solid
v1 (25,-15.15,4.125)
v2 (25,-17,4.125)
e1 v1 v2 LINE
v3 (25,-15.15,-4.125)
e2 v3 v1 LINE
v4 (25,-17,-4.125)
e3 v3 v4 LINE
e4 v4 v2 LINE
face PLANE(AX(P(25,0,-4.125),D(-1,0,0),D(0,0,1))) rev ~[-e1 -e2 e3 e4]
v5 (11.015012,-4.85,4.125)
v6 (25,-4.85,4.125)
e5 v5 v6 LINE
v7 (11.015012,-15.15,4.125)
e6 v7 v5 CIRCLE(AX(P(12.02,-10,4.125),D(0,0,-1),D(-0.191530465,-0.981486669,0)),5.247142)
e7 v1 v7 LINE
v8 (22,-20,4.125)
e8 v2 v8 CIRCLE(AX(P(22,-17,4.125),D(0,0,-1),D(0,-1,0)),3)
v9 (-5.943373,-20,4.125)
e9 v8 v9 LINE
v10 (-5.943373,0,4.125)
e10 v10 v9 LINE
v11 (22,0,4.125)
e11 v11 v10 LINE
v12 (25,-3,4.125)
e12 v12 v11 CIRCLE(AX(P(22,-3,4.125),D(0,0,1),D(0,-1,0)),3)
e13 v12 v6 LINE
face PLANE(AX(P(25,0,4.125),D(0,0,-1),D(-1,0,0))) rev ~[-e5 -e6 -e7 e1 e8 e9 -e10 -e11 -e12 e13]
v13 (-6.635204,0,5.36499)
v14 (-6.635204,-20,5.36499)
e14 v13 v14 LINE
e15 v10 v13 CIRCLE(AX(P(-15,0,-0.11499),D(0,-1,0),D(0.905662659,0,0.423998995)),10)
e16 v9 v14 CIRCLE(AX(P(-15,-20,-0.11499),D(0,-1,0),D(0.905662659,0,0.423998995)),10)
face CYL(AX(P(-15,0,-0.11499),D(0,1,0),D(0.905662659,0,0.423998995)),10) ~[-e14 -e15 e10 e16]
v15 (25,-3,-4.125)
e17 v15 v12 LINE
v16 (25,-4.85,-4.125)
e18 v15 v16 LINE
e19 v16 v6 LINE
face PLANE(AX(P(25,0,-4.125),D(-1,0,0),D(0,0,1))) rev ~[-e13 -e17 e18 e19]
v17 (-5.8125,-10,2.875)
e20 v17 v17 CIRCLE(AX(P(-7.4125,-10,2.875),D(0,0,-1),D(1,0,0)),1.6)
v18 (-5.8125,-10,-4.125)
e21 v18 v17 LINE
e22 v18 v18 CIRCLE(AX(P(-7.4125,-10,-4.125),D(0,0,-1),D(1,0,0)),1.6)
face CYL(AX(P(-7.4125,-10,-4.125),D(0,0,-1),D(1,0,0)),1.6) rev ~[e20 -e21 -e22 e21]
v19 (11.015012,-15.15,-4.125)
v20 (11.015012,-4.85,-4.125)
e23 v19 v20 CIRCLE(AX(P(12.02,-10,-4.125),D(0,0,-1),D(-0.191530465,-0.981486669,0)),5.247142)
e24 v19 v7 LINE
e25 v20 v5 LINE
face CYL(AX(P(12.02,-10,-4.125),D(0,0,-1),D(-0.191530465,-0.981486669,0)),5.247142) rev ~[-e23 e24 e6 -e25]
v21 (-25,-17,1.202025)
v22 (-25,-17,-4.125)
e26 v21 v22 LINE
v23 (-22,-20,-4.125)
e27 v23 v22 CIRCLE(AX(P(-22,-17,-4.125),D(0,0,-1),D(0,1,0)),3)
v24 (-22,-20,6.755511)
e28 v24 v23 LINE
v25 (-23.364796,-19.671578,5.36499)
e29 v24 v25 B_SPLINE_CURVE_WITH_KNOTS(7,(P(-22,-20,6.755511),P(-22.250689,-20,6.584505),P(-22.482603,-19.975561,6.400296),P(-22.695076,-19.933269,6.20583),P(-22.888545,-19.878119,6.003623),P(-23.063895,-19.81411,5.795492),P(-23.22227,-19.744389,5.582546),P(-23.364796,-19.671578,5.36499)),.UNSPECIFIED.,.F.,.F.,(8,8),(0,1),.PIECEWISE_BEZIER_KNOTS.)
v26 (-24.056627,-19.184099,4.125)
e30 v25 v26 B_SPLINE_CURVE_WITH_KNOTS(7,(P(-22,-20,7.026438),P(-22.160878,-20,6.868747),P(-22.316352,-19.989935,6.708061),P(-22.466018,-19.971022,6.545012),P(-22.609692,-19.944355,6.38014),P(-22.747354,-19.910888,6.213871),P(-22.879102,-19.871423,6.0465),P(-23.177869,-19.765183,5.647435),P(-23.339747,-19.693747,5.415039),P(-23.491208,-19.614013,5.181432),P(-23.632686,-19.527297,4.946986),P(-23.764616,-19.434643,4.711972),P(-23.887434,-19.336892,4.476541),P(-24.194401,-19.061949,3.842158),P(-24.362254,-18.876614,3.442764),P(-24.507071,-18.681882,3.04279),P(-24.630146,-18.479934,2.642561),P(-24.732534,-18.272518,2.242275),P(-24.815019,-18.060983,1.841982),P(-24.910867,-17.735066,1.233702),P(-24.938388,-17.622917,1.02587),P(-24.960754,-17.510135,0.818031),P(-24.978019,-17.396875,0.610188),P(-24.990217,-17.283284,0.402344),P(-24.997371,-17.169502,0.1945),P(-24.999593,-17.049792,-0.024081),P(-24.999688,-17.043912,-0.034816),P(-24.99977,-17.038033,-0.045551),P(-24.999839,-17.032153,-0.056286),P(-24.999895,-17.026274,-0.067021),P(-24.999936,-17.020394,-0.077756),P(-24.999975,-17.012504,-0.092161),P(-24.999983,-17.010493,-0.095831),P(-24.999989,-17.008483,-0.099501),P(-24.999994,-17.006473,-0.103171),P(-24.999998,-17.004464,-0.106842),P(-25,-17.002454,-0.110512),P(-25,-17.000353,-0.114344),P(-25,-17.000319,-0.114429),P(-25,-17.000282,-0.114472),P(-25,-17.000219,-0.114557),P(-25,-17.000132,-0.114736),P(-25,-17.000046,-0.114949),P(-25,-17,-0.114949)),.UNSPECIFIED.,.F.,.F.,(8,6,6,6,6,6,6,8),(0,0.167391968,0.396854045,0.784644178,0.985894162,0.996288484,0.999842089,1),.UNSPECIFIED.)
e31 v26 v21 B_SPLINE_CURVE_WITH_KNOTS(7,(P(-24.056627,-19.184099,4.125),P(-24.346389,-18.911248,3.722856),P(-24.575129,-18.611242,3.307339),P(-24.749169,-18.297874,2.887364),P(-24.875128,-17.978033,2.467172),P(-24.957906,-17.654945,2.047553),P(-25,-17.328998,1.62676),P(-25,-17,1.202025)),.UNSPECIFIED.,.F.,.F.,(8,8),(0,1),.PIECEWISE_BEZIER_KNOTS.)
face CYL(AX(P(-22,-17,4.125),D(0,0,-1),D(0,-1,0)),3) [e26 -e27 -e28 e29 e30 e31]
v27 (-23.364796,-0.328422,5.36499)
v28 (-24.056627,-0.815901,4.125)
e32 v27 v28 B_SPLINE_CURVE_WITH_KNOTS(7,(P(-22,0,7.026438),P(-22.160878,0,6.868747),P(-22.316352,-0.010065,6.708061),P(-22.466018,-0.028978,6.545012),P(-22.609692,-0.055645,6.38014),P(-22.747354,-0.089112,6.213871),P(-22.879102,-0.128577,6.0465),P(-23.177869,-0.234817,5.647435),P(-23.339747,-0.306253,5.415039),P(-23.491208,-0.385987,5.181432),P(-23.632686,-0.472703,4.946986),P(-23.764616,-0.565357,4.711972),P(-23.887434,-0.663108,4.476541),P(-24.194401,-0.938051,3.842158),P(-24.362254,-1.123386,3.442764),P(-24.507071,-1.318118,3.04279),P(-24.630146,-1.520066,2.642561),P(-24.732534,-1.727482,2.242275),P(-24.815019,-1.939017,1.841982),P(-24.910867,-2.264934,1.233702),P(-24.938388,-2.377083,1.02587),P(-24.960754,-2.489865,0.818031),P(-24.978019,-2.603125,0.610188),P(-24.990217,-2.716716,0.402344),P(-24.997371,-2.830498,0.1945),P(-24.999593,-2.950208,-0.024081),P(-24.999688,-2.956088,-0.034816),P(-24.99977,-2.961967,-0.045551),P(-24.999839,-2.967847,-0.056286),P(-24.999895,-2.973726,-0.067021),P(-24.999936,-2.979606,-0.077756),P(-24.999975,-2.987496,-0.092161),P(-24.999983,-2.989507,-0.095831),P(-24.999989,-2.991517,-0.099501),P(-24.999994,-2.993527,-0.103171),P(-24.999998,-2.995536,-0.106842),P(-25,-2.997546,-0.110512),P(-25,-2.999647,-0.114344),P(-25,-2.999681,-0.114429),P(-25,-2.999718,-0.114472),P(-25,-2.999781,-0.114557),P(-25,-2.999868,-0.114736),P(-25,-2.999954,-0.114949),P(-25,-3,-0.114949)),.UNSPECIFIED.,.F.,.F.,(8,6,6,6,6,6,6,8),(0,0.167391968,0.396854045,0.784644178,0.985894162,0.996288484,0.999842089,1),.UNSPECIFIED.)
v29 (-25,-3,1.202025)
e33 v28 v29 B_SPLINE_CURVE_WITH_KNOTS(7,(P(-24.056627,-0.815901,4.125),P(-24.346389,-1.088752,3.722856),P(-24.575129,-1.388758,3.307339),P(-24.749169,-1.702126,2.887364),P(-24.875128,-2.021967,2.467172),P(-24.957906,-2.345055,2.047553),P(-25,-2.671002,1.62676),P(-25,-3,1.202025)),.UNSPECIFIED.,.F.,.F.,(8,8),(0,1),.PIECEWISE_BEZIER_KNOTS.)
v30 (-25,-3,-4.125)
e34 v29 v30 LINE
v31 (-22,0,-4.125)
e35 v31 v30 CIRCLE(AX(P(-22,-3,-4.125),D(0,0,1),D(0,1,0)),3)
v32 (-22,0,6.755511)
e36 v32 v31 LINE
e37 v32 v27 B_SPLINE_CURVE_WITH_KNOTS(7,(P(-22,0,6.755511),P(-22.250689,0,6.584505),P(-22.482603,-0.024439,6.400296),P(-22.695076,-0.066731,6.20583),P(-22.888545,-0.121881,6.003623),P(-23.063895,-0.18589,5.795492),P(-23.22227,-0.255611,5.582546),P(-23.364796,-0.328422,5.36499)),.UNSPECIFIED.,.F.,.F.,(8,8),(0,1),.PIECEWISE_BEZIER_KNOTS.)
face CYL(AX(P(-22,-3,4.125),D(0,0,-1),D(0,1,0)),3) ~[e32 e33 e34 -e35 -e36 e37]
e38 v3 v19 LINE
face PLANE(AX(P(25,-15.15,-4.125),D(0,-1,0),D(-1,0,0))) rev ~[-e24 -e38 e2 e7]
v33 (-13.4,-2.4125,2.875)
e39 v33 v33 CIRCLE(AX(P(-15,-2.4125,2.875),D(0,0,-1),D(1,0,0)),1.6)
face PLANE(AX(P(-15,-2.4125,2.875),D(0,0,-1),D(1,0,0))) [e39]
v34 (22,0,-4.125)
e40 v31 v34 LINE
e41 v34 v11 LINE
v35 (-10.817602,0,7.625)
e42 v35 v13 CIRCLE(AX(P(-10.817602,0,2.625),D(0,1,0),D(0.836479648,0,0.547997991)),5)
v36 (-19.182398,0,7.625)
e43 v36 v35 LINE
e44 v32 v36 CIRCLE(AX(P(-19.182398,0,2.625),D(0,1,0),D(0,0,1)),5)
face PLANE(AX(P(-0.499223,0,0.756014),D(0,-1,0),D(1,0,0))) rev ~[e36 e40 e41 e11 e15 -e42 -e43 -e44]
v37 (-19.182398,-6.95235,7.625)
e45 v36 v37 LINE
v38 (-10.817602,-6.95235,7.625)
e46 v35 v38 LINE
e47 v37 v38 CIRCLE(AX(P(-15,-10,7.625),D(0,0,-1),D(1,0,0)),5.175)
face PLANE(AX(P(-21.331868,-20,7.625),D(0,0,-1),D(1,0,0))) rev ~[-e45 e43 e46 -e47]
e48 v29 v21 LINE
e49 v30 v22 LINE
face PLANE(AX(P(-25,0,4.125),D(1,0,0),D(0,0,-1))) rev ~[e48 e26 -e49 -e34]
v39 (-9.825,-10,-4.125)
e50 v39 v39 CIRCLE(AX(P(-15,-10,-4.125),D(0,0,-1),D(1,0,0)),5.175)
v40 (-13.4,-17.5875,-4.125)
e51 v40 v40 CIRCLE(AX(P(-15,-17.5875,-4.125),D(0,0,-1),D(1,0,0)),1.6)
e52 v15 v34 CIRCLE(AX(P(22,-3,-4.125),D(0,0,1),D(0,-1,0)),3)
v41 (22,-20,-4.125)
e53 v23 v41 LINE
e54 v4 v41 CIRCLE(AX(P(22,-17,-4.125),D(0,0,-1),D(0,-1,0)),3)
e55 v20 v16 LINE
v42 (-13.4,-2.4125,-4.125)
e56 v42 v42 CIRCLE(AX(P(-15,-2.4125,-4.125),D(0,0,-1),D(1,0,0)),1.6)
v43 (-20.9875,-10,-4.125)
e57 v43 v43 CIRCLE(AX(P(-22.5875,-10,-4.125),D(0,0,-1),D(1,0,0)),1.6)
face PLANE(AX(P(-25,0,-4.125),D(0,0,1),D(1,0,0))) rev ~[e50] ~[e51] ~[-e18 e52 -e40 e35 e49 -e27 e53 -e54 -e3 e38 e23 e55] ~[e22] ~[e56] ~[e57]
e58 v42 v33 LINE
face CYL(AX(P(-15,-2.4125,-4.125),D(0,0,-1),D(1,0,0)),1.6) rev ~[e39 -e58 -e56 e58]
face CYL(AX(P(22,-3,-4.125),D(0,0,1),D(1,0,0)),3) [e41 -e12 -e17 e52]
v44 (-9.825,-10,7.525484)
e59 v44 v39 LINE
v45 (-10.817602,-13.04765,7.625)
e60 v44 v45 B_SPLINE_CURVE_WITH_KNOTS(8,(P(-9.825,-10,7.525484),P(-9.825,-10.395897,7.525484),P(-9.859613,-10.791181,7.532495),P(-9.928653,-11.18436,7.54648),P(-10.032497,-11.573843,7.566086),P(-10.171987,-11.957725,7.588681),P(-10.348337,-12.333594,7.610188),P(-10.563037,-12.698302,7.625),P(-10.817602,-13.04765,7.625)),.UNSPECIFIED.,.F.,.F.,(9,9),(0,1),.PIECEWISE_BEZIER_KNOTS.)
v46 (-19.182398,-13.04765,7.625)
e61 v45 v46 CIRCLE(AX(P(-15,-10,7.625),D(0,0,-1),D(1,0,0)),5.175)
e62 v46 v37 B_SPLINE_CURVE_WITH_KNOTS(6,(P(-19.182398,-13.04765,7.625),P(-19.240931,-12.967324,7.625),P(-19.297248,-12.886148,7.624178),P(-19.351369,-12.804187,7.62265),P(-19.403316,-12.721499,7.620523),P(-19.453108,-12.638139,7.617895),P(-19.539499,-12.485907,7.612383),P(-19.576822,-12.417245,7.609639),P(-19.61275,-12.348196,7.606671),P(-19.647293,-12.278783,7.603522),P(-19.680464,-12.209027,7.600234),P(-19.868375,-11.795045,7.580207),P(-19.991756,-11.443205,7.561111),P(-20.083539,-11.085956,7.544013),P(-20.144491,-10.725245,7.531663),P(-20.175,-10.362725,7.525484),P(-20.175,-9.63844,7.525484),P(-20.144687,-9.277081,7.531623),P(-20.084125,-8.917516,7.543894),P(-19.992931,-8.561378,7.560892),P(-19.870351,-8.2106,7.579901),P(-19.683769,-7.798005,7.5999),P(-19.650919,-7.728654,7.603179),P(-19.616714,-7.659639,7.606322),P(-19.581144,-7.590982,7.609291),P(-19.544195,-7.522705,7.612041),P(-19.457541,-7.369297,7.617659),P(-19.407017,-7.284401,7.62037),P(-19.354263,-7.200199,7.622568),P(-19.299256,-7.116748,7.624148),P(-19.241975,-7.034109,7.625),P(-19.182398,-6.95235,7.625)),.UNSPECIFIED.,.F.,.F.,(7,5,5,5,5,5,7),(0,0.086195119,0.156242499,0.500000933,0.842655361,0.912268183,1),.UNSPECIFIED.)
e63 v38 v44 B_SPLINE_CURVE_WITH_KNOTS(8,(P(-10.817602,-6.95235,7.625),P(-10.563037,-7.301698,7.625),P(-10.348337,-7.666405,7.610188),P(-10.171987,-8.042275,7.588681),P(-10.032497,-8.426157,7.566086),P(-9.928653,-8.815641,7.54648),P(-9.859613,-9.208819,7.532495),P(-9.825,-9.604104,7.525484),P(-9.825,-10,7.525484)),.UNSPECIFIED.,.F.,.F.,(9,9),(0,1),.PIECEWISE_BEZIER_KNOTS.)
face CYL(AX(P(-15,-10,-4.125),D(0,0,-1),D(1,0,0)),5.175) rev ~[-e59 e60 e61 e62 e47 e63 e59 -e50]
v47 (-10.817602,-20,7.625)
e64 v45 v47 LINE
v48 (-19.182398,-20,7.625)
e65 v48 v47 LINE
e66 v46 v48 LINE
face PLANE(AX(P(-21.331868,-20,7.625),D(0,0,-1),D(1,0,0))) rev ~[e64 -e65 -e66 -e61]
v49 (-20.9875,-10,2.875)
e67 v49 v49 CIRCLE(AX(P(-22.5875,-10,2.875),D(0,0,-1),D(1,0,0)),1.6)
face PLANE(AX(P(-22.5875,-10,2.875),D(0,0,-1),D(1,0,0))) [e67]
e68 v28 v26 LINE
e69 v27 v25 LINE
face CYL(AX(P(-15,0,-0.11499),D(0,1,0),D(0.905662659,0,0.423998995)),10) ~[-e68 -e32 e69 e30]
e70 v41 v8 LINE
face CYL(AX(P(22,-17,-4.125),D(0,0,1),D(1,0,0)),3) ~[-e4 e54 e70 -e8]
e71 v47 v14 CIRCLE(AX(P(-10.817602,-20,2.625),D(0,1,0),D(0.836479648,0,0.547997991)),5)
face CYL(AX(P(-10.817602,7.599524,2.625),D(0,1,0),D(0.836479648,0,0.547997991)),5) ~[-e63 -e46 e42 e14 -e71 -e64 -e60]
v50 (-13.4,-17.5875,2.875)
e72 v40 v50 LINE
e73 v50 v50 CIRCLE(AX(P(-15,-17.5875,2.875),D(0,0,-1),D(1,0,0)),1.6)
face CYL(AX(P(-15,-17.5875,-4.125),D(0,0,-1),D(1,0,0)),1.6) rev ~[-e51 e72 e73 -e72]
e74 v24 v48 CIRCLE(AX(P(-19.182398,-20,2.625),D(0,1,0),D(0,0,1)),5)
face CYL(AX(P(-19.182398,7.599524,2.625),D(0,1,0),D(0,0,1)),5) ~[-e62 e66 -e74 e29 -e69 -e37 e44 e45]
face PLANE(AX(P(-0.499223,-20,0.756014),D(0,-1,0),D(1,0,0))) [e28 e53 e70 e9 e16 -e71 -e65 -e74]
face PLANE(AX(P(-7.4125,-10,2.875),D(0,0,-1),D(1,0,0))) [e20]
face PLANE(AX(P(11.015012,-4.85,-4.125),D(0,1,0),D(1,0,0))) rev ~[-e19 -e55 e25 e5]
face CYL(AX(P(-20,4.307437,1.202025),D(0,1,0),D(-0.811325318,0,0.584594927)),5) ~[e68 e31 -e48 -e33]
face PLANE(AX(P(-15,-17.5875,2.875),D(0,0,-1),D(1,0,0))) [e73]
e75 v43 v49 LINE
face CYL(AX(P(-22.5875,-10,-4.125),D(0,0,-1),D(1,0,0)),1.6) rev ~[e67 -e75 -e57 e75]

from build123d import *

# Parameters (mm, degrees)
F1_DEPTH     = 20
F2_R         = 1.6
F2_R_2       = 5.175
F3_DEPTH     = 7
F4_DEPTH     = 25
F5_R         = 3
F6_T1_DEPTH  = 28.6148731674
F7_DEPTH     = 25
F9_DEPTH     = 25
F10_T1_DEPTH = 35.1990481771


# Not quite as in the source:
# - a fillet or chamfer that OpenCascade refuses, or shapes differently, is made with other operations: its cross-section is extruded or revolved along the edge and cut away or added
# - a feature names something its author has since deleted; it is built from what else it names


with BuildPart() as f1:
    # F0 (on Front) → F1 (new body)
    with BuildSketch(Plane.XZ):
        with BuildLine():
            Line((-25, -4.125), (25, -4.125))
            Line((25, -4.125), (25, 4.125))
            Line((25, 4.125), (-5.9433734098, 4.125))
            ThreePointArc((-5.9433734098, 4.125), (-15, 9.8850100464), (-24.0566265902, 4.125))
            Line((-24.0566265902, 4.125), (-25, 4.125))
            Line((-25, 4.125), (-25, -4.125))
        make_face()
    extrude(amount=F1_DEPTH)

    # F2 (on face) → F3 (cut)
    with BuildSketch(Plane(origin=(0, 0, -4.125), x_dir=(1, 0, 0), z_dir=(0, 0, -1))):
        with Locations((-22.5875, 10)):
            Circle(F2_R)
        with Locations((-15, 10)):
            Circle(F2_R_2)
        with Locations((-15, 17.5875)):
            Circle(F2_R)
        with Locations((-15, 2.4125)):
            Circle(F2_R)
        with Locations((-7.4125, 10)):
            Circle(F2_R)
    extrude(amount=-F3_DEPTH, mode=Mode.SUBTRACT)

    # F4 (cut): a face of the model
    f4_faces = [f1.faces().sort_by_distance(p)[0] for p in [
        (-15, -10, 2.875),
    ]]
    extrude(f4_faces, amount=-F4_DEPTH, mode=Mode.SUBTRACT)

    # F5
    f5_edges = [f1.edges().sort_by_distance(p)[0] for p in [
        (25, 0, 0),
        (25, -20, 0),
        (-25, 0, 0),
        (-25, -20, 0),
    ]]
    fillet(f5_edges, radius=F5_R)

    # F6: fillet of radius 5 on 1 edges, made by hand

    # F6_s2 → F6_t1 (cut)
    with BuildSketch(Plane.XZ.offset(-4.3074365837)):
        with BuildLine():
            ThreePointArc((-24.0566265902, 4.125), (-24.7583155082, 2.7377445871), (-25, 1.2020253665))
            Line((-25, 1.2020253665), (-25, 4.125))
            Line((-25, 4.125), (-24.0566265902, 4.125))
        make_face()
    extrude(amount=F6_T1_DEPTH, mode=Mode.SUBTRACT)

    # F2 (on face) → F7 (cut)
    with BuildSketch(Plane(origin=(0, 0, -4.125), x_dir=(1, 0, 0), z_dir=(0, 0, -1))):
        with BuildLine():
            Line((25, 4.85), (25, 15.15))
            Line((25, 15.15), (11.0150124379, 15.15))
            ThreePointArc((11.0150124379, 15.15), (6.7728579207, 10), (11.0150124379, 4.85))
            Line((11.0150124379, 4.85), (25, 4.85))
        make_face()
    extrude(amount=-F7_DEPTH, mode=Mode.SUBTRACT)

    # F8 (on face) → F9 (cut)
    with BuildSketch(Plane.XZ.offset(20)):
        with BuildLine():
            Line((-21.3318682487, 7.625), (-8.6681317513, 7.625))
            ThreePointArc((-8.6681317513, 7.625), (-15, 9.8850100464), (-21.3318682487, 7.625))
        make_face()
    extrude(amount=-F9_DEPTH, mode=Mode.SUBTRACT)

    # F10: fillet of radius 5 on 2 edges, made by hand

    # F10_s2 → F10_t1 (cut)
    with BuildSketch(Plane.XZ.offset(-7.5995240885)):
        with BuildLine():
            ThreePointArc((-19.182398242, 7.625), (-21.55937639, 7.0238606347), (-23.3647964839, 5.3649899536))
            ThreePointArc((-23.3647964839, 5.3649899536), (-22.4347091347, 6.5726927603), (-21.3318682487, 7.625))
            Line((-21.3318682487, 7.625), (-19.182398242, 7.625))
        make_face()
        with BuildLine():
            ThreePointArc((-6.6352035161, 5.3649899536), (-8.44062361, 7.0238606347), (-10.817601758, 7.625))
            Line((-10.817601758, 7.625), (-8.6681317513, 7.625))
            ThreePointArc((-8.6681317513, 7.625), (-7.5652908653, 6.5726927603), (-6.6352035161, 5.3649899536))
        make_face()
    extrude(amount=F10_T1_DEPTH, mode=Mode.SUBTRACT)


solid = f1.part
